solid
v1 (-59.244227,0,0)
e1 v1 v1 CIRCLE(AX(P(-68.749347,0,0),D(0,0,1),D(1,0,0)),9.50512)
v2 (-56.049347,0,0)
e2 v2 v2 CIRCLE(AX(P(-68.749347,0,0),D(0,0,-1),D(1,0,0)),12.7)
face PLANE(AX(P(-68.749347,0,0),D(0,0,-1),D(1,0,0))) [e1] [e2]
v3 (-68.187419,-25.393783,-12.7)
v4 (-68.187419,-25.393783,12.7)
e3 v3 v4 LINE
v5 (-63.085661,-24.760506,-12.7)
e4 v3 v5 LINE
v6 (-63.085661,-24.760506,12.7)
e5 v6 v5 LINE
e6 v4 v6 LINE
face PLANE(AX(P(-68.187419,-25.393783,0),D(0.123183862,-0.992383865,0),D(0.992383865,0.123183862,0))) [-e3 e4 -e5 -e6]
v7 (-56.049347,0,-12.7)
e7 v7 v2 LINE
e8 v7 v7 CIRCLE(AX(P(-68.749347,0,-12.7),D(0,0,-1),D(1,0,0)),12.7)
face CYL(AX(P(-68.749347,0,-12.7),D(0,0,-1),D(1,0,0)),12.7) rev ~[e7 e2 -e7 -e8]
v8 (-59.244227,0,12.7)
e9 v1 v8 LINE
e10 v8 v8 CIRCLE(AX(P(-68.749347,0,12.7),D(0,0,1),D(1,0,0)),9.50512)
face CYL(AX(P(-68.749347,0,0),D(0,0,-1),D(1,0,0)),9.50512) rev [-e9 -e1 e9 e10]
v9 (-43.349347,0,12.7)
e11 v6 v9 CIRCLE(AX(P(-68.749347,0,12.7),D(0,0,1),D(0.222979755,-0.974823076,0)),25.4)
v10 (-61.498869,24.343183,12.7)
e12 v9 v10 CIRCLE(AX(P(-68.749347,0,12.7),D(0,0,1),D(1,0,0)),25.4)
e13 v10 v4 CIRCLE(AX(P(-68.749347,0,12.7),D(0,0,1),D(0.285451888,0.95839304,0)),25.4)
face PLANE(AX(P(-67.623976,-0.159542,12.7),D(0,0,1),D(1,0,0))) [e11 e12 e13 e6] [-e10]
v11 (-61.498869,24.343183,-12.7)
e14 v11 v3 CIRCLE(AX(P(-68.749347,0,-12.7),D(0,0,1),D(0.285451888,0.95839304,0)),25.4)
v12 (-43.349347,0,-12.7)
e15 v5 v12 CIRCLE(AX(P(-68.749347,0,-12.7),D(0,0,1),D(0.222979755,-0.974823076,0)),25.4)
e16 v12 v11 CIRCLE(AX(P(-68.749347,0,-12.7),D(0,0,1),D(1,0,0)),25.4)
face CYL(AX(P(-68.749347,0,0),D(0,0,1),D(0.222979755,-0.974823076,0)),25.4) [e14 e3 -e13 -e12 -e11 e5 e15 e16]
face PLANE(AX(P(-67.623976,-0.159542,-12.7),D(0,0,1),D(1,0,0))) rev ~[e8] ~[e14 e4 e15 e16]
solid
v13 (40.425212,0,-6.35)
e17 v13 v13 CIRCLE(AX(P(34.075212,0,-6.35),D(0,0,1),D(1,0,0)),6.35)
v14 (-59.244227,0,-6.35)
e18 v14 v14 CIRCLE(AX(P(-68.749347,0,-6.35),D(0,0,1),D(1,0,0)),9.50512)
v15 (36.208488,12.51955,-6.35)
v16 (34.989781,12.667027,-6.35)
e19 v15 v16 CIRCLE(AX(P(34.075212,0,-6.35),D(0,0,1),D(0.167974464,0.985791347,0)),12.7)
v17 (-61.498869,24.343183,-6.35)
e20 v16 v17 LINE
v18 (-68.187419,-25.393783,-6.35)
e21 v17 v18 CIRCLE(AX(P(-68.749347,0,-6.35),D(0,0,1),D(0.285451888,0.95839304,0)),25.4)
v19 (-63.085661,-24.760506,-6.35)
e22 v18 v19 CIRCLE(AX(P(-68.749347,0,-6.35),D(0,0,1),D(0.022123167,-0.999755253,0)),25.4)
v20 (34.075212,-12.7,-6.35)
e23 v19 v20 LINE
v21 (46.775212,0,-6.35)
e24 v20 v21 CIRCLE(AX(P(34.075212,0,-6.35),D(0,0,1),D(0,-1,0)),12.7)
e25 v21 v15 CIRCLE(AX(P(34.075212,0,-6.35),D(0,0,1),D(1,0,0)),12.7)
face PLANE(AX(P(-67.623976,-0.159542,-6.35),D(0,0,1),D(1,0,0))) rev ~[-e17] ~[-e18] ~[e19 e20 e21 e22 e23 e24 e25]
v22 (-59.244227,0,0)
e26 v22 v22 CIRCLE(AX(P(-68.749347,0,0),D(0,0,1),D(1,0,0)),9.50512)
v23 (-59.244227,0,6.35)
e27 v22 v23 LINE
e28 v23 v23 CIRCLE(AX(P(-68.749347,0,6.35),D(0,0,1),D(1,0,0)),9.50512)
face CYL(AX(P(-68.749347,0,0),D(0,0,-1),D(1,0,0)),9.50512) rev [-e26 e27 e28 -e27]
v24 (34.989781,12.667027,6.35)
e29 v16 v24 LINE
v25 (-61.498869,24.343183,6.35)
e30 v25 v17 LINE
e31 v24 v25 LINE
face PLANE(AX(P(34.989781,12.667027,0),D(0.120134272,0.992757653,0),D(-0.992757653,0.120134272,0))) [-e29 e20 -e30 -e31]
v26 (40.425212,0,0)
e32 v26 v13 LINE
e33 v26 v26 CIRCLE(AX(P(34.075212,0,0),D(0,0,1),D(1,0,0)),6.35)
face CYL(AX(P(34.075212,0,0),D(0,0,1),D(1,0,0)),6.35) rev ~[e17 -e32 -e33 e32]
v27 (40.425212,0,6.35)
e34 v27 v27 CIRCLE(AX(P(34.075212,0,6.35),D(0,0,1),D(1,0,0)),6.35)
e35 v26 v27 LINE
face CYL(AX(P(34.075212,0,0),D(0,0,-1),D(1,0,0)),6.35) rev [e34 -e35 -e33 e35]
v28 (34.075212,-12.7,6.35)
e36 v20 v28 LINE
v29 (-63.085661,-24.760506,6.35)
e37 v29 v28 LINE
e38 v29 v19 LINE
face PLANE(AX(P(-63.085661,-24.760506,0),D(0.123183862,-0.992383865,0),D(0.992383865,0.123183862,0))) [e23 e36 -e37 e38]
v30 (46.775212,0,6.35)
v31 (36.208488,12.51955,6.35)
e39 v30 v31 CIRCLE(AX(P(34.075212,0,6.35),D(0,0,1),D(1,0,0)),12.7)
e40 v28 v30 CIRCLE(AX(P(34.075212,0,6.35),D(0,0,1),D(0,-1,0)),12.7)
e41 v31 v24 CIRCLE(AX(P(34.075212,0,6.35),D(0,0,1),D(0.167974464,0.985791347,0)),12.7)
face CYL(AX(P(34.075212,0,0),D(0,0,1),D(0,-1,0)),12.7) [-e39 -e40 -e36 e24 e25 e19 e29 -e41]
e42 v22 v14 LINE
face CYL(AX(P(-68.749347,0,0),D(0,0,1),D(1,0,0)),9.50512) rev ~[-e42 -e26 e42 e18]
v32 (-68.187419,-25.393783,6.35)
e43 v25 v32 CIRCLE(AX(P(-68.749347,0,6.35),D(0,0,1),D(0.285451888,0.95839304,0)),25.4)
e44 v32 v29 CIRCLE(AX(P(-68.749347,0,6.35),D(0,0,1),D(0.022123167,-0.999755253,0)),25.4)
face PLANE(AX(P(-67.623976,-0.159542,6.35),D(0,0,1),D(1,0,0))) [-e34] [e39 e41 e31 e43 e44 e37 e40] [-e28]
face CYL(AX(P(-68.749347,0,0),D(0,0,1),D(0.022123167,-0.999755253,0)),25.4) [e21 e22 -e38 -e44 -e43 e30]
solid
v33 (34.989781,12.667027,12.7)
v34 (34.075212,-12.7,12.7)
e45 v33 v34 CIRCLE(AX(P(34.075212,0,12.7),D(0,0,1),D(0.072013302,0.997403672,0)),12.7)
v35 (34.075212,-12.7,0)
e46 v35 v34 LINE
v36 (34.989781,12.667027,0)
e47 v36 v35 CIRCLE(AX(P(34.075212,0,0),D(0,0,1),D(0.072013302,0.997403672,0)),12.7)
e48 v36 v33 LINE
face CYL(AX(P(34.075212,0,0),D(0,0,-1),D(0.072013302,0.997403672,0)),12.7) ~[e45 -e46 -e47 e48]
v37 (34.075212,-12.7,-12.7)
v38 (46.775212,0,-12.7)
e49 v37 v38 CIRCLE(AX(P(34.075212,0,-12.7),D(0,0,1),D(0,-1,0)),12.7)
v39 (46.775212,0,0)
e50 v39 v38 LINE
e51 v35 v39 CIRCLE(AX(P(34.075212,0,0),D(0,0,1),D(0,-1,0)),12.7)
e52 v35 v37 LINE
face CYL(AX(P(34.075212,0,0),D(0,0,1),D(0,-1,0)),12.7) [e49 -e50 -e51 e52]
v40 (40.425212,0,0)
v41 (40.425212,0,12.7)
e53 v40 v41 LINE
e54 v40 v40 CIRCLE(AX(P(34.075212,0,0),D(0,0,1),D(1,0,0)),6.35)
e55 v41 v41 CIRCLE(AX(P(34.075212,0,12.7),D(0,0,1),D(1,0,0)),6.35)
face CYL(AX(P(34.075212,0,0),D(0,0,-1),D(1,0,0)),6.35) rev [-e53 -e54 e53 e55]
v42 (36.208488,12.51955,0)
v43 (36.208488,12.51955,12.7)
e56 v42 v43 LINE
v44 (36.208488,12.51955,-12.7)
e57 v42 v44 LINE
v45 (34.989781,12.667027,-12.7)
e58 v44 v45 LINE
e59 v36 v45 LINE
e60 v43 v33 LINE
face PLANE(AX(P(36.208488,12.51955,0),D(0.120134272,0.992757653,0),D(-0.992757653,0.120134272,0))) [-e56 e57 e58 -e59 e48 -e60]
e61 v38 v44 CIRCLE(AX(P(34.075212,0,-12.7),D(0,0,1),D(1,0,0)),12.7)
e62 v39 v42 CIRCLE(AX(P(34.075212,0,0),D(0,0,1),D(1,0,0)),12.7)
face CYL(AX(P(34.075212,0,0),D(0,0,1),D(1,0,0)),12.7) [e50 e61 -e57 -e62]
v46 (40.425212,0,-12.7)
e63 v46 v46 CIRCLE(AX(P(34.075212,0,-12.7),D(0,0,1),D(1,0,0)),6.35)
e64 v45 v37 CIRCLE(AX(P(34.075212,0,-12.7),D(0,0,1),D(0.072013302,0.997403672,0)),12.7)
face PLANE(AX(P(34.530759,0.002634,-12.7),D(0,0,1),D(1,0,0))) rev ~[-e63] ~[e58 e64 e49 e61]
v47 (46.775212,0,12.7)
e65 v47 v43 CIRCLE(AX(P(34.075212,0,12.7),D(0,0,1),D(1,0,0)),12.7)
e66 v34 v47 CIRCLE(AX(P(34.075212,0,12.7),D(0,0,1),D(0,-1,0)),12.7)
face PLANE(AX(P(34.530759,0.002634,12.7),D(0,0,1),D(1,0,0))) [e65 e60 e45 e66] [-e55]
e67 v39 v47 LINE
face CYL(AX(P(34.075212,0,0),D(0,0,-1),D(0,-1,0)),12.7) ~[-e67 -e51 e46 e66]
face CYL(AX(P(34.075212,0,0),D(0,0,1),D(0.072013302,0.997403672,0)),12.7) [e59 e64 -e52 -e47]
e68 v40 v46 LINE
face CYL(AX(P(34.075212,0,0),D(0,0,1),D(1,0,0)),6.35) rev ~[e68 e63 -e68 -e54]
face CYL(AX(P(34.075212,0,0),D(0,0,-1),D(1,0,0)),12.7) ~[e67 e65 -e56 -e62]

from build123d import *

# Parameters (mm, degrees)
F0_R          = 9.5051197762
F1_DEPTH      = 12.7
F1_DEPTH_BACK = 12.7
F0_R_2        = 6.35
F2_DEPTH      = 6.35
F2_DEPTH_BACK = 6.35
F3_R          = 12.7
F4_DEPTH      = 12.7


with BuildPart() as f1:
    # F0 (on Top) → F1 (new body, two sides)
    with BuildSketch(Plane.XY) as f1_sk:
        with BuildLine():
            ThreePointArc((-63.0856611977, -24.7605061219), (-48.8871011462, -15.8319673643), (-43.3493469753, 0))
            ThreePointArc((-43.3493469753, 0), (-48.3861185924, 15.1821912064), (-61.498869009, 24.3431832196))
            ThreePointArc((-61.498869009, 24.3431832196), (-93.9227433709, 3.3852789998), (-68.187418541, -25.393783421))
            Line((-68.187418541, -25.393783421), (-63.0856611977, -24.7605061219))
        make_face()
        with Locations((-68.7493469753, 0)):
            Circle(F0_R, mode=Mode.SUBTRACT)
    extrude(amount=F1_DEPTH)
    extrude(f1_sk.sketch, amount=-F1_DEPTH_BACK)

    # F3 (on face) → F4 (cut)
    with BuildSketch(Plane(origin=(0, 0, -12.7), x_dir=(1, 0, 0), z_dir=(0, 0, -1))):
        with Locations((-68.7493469753, 0)):
            Circle(F3_R)
    extrude(amount=-F4_DEPTH, mode=Mode.SUBTRACT)


with BuildPart() as f1b:
    # F0 (on Top) → F1, piece 2 (new body, two sides)
    with BuildSketch(Plane.XY) as f1_2_sk:
        with BuildLine():
            Line((36.2084881778, 12.5195501056), (34.9897814236, 12.6670266309))
            ThreePointArc((34.9897814236, 12.6670266309), (21.383458511, 0.4575815704), (34.0752124917, -12.7))
            ThreePointArc((34.0752124917, -12.7), (43.0554686128, -8.9802561211), (46.7752124917, 0))
            ThreePointArc((46.7752124917, 0), (43.7804327678, 8.1913795782), (36.2084881778, 12.5195501056))
        make_face()
        with Locations((34.0752124917, 0)):
            Circle(F0_R_2, mode=Mode.SUBTRACT)
    extrude(amount=F1_DEPTH)
    extrude(f1_2_sk.sketch, amount=-F1_DEPTH_BACK)


with BuildPart() as f2:
    # F0 (on Top) → F2 (new body, two sides)
    with BuildSketch(Plane.XY) as f2_sk:
        with BuildLine():
            ThreePointArc((-63.0856611977, -24.7605061219), (-48.8871011462, -15.8319673643), (-43.3493469753, 0))
            ThreePointArc((-43.3493469753, 0), (-48.3861185924, 15.1821912064), (-61.498869009, 24.3431832196))
            ThreePointArc((-61.498869009, 24.3431832196), (-93.9227433709, 3.3852789998), (-68.187418541, -25.393783421))
            Line((-68.187418541, -25.393783421), (-63.0856611977, -24.7605061219))
        make_face()
        with Locations((-68.7493469753, 0)):
            Circle(F0_R, mode=Mode.SUBTRACT)
        with BuildLine():
            ThreePointArc((-61.498869009, 24.3431832196), (-48.3861185924, 15.1821912064), (-43.3493469753, 0))
            ThreePointArc((-43.3493469753, 0), (-48.8871011462, -15.8319673643), (-63.0856611977, -24.7605061219))
            Line((-63.0856611977, -24.7605061219), (34.0752124917, -12.7))
            ThreePointArc((34.0752124917, -12.7), (21.383458511, 0.4575815704), (34.9897814236, 12.6670266309))
            Line((34.9897814236, 12.6670266309), (-61.498869009, 24.3431832196))
        make_face()
        with BuildLine():
            ThreePointArc((-68.187418541, -25.393783421), (-65.6204768736, -25.2065501782), (-63.0856611977, -24.7605061219))
            Line((-63.0856611977, -24.7605061219), (-68.187418541, -25.393783421))
        make_face()
        with BuildLine():
            Line((36.2084881778, 12.5195501056), (34.9897814236, 12.6670266309))
            ThreePointArc((34.9897814236, 12.6670266309), (21.383458511, 0.4575815704), (34.0752124917, -12.7))
            ThreePointArc((34.0752124917, -12.7), (43.0554686128, -8.9802561211), (46.7752124917, 0))
            ThreePointArc((46.7752124917, 0), (43.7804327678, 8.1913795782), (36.2084881778, 12.5195501056))
        make_face()
        with Locations((34.0752124917, 0)):
            Circle(F0_R_2, mode=Mode.SUBTRACT)
        with BuildLine():
            ThreePointArc((36.2084881778, 12.5195501056), (35.60091775, 12.6080221869), (34.9897814236, 12.6670266309))
            Line((34.9897814236, 12.6670266309), (36.2084881778, 12.5195501056))
        make_face()
    extrude(amount=F2_DEPTH)
    extrude(f2_sk.sketch, amount=-F2_DEPTH_BACK)


solid = Compound([f1.part, f1b.part, f2.part])
